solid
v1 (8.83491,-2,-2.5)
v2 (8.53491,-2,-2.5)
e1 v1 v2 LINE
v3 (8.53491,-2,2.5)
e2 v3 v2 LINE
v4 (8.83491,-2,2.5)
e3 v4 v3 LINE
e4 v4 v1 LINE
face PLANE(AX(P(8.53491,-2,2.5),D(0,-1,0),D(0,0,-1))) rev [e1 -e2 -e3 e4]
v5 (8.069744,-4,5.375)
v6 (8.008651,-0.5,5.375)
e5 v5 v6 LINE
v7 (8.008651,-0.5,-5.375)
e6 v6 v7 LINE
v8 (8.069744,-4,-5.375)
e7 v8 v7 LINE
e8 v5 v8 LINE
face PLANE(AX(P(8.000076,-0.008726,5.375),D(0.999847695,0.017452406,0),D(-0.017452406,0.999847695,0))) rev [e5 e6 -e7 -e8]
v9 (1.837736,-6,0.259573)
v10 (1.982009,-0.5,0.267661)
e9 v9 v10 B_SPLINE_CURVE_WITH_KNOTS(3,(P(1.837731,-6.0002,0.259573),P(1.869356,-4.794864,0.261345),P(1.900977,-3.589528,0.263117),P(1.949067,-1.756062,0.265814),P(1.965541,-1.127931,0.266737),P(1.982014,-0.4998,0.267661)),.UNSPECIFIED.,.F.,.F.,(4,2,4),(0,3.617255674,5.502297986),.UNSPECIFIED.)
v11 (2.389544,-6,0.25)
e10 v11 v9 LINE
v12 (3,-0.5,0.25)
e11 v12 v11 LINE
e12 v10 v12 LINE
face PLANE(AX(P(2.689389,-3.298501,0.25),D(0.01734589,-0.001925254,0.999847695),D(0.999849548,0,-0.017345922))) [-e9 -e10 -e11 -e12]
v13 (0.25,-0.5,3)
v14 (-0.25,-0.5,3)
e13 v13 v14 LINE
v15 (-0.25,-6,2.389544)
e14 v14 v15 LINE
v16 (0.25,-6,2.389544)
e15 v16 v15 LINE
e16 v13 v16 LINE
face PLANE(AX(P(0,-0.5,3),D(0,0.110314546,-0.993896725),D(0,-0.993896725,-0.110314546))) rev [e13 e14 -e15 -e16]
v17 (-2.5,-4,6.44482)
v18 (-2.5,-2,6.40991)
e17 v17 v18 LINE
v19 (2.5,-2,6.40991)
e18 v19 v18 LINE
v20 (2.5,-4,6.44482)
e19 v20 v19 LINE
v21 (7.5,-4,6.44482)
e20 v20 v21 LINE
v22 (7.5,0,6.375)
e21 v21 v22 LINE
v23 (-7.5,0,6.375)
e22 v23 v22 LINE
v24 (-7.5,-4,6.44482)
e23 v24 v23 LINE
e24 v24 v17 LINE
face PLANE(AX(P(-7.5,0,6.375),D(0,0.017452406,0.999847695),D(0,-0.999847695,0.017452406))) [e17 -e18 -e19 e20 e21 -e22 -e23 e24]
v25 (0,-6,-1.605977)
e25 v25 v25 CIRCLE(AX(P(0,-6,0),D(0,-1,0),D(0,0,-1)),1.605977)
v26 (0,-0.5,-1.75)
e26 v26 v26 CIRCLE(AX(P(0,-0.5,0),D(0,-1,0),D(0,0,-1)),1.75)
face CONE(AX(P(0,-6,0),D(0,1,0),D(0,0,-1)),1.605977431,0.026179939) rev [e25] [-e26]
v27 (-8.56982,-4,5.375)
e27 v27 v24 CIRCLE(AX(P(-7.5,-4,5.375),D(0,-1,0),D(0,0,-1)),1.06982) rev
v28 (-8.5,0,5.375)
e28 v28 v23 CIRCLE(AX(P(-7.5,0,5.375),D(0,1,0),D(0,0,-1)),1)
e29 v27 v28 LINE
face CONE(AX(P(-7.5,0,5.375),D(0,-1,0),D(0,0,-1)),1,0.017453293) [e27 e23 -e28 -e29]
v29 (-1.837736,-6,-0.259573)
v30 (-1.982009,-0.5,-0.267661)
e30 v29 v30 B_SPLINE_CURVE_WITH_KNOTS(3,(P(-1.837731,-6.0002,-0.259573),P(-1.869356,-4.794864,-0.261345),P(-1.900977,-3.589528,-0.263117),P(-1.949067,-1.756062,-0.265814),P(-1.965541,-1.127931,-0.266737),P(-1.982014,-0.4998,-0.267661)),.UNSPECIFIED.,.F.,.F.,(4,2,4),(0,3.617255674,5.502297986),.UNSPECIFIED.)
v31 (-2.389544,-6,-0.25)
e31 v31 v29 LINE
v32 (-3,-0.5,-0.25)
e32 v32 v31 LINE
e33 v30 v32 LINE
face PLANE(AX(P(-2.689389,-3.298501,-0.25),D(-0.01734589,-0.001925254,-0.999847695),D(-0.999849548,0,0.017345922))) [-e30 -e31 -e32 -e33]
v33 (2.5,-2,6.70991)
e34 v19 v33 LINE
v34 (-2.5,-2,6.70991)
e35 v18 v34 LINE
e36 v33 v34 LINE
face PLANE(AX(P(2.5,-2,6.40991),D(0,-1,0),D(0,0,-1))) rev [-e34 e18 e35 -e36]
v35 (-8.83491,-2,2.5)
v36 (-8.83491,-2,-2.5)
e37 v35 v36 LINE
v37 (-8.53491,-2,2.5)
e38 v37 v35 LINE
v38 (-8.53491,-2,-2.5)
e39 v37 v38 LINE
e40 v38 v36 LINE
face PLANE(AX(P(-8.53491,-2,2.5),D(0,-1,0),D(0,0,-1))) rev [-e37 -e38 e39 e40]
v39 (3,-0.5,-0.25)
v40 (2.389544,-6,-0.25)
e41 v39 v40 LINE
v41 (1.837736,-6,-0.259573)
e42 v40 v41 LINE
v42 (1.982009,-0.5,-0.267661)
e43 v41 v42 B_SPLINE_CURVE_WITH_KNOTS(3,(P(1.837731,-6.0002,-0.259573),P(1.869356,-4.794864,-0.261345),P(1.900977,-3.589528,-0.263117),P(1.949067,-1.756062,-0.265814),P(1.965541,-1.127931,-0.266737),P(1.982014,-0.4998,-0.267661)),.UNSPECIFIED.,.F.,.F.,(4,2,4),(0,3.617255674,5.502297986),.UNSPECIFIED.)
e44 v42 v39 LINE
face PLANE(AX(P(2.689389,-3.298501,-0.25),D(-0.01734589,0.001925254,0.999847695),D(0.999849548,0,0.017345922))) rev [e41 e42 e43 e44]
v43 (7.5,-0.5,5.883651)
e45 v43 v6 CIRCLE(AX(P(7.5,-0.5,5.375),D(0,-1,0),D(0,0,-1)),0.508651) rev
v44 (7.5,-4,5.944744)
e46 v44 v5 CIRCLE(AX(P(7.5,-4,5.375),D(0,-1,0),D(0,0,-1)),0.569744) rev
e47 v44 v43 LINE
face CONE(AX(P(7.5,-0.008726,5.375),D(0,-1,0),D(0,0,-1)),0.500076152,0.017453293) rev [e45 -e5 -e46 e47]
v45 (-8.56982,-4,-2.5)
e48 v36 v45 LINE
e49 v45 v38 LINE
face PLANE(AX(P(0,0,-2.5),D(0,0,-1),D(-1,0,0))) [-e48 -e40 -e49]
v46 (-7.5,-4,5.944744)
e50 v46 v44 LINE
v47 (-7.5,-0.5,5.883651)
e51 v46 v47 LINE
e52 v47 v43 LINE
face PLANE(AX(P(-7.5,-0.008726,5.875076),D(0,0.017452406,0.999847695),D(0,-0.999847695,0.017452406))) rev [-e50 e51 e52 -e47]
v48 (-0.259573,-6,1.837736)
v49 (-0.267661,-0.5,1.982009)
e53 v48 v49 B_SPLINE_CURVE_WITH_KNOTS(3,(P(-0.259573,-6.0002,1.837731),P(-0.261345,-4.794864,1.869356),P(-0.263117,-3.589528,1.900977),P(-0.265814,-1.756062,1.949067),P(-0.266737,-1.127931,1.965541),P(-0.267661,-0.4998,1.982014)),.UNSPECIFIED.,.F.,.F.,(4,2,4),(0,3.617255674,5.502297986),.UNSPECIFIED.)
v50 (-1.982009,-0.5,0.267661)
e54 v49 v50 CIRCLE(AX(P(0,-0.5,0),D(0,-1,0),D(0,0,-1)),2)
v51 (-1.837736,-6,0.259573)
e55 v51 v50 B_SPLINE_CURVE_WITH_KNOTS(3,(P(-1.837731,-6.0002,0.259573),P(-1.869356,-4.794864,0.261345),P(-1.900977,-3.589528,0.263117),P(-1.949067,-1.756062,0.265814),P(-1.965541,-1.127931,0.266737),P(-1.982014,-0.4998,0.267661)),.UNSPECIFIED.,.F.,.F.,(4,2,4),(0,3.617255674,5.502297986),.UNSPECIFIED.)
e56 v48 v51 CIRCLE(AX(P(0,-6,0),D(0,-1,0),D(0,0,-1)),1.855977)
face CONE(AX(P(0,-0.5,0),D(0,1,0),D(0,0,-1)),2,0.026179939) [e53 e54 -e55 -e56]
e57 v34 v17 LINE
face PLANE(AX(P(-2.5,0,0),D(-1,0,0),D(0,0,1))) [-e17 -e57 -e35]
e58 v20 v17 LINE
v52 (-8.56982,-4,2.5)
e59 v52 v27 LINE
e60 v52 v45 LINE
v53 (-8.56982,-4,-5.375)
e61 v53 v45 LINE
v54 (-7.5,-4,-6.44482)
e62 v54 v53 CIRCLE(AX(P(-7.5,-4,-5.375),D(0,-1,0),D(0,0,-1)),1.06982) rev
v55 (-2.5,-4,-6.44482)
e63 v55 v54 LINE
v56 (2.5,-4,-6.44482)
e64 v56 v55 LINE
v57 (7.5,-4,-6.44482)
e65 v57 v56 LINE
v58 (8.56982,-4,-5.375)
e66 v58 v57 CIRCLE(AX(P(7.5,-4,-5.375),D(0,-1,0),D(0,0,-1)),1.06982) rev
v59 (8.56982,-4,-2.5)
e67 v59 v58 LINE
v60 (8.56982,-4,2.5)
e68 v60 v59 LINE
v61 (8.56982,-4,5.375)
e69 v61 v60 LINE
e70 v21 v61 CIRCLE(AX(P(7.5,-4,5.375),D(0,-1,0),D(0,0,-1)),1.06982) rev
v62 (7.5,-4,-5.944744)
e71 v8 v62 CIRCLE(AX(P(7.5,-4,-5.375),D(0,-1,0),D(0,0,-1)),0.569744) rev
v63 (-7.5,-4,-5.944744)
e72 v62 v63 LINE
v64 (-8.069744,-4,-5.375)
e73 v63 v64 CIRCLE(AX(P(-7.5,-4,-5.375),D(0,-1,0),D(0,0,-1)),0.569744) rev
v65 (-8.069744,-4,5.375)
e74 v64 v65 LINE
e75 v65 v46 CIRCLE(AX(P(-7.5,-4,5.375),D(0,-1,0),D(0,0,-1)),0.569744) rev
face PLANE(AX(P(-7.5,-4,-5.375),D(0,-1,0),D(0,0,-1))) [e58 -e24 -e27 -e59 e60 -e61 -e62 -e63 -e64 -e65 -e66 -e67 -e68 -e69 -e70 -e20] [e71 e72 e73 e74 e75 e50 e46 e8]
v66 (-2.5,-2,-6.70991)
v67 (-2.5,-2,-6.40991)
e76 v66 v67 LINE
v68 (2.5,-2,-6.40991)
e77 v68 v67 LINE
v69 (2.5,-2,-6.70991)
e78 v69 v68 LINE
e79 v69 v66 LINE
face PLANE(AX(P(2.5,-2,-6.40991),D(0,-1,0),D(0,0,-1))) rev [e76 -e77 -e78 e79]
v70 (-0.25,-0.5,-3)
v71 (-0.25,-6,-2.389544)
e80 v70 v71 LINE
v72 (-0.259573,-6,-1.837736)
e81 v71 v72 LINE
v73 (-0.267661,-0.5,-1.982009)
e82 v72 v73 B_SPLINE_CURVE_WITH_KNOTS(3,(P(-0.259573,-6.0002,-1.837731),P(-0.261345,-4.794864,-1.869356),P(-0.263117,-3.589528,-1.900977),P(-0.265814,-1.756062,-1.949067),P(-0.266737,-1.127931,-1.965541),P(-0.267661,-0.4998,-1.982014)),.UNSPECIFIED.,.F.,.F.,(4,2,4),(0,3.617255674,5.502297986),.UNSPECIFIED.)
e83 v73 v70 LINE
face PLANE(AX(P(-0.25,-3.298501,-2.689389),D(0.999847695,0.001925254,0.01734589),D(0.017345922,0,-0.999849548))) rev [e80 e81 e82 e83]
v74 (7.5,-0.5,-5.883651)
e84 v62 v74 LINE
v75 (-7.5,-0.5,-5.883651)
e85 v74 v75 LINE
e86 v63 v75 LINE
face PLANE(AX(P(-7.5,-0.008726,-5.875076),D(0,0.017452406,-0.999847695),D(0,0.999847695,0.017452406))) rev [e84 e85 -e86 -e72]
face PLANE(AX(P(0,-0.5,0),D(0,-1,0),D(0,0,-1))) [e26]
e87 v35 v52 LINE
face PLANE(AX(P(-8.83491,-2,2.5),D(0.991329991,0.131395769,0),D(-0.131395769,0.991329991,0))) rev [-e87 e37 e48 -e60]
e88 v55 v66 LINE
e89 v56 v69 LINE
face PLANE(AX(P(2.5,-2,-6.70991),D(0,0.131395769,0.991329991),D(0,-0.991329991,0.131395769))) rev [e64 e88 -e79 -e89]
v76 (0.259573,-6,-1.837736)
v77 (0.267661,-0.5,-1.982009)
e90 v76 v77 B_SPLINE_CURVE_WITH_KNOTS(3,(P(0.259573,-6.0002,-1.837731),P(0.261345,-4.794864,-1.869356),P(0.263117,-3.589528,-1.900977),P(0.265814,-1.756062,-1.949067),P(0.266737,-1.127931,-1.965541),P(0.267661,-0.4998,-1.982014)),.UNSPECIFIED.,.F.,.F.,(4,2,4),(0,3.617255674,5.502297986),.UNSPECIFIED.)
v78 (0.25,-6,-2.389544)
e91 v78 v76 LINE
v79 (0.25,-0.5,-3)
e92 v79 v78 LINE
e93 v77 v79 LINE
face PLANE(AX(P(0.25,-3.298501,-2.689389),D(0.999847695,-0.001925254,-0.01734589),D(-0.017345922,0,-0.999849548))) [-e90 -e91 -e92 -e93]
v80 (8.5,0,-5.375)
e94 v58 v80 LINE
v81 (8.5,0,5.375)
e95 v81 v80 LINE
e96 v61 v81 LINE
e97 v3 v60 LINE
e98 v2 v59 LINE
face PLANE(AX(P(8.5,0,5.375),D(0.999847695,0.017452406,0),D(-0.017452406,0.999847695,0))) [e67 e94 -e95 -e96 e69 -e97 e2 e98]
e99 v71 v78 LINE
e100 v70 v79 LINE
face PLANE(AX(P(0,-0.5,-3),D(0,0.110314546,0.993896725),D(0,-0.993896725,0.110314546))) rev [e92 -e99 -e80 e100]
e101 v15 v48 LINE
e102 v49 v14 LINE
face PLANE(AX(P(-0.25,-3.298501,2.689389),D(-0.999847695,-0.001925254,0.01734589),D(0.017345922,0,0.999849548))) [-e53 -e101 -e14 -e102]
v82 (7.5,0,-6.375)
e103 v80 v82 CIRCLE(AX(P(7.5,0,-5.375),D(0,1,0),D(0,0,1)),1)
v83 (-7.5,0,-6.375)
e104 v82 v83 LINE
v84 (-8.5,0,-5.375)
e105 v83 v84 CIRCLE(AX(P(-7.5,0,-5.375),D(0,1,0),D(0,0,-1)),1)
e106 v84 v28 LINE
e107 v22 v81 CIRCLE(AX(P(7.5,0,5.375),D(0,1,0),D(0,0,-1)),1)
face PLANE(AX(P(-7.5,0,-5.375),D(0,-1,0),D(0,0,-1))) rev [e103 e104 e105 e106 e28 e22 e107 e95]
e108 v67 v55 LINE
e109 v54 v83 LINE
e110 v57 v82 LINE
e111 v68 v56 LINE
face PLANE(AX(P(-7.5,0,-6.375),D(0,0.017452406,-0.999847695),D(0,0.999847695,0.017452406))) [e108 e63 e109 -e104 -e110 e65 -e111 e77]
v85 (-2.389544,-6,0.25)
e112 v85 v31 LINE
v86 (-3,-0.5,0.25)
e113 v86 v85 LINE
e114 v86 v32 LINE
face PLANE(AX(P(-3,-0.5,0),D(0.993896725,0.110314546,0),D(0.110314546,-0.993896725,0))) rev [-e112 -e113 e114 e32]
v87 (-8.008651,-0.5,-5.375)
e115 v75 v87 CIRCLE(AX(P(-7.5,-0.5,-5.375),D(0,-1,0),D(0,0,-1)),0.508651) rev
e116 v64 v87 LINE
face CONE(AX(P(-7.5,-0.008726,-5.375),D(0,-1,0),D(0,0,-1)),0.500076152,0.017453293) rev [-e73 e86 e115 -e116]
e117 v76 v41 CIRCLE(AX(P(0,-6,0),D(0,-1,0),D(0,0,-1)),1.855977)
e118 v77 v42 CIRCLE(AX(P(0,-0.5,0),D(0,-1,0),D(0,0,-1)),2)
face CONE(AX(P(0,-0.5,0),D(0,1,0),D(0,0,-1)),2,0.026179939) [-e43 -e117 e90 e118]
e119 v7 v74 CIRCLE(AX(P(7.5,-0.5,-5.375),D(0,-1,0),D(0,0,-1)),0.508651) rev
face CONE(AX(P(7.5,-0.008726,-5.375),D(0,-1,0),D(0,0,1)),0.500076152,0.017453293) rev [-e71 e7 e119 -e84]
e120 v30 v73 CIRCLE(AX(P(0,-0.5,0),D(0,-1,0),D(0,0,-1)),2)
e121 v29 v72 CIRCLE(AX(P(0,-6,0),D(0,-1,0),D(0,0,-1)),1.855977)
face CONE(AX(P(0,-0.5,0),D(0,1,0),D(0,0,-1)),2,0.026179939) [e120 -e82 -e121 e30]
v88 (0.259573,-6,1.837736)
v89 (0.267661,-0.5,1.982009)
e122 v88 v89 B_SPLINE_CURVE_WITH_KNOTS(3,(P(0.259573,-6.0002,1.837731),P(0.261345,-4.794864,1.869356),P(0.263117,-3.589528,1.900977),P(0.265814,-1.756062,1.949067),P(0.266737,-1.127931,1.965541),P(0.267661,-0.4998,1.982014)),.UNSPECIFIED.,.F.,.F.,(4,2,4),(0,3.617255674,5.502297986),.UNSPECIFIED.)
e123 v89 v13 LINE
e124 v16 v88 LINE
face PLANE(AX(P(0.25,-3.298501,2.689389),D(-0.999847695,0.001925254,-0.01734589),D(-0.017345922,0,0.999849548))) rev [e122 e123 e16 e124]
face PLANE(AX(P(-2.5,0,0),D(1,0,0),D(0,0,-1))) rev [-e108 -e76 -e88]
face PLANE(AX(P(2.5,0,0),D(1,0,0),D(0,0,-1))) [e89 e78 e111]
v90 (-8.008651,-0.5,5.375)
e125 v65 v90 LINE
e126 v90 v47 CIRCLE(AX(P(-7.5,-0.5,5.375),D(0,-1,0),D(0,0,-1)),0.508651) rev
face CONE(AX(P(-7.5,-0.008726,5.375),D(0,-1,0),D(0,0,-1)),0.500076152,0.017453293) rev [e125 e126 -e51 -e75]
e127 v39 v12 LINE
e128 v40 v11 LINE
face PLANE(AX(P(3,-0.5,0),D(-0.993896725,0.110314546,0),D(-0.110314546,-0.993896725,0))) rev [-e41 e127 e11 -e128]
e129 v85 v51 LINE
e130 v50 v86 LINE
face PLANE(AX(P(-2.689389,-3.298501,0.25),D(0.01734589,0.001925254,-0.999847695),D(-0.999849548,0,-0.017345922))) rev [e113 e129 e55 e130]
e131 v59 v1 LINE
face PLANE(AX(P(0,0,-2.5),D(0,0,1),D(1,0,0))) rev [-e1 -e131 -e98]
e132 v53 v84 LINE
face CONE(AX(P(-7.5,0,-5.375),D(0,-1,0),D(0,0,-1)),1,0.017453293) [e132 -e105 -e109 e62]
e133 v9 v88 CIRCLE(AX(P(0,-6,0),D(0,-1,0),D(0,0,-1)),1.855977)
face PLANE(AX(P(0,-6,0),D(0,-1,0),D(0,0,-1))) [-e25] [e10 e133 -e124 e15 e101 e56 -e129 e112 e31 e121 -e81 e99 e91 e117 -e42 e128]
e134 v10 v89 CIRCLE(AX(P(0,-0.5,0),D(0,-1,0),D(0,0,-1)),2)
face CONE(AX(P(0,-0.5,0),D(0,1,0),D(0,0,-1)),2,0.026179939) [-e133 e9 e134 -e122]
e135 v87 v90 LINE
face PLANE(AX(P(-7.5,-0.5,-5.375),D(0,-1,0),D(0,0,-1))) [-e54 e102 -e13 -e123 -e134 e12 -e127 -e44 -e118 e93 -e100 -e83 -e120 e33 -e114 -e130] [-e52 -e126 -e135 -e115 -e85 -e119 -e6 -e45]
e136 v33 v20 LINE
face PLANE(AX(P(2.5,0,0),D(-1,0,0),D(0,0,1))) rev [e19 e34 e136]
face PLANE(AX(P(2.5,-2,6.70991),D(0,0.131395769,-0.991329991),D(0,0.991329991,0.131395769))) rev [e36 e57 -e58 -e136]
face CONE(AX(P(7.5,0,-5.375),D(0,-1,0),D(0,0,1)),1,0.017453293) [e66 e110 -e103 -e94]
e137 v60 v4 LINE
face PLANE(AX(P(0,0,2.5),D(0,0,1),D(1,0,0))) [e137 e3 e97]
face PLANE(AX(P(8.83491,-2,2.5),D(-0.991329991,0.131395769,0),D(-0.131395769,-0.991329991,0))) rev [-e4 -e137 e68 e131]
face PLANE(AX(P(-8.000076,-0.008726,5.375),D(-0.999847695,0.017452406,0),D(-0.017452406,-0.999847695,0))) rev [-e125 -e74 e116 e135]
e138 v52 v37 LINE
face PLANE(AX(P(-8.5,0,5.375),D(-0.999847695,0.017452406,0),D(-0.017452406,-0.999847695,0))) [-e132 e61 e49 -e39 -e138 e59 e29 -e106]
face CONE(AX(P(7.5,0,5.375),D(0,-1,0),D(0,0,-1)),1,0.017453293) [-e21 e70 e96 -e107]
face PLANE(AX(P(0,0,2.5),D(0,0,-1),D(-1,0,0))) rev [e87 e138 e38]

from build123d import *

# Parameters (mm, degrees)
BOSS_EXTRUDE1_DEPTH = 4
BOSS_EXTRUDE1_DRAFT = 1
SHELL1_T            = -0.5
SKETCH2_R           = 2
BOSS_EXTRUDE2_DEPTH = 5.5
BOSS_EXTRUDE2_TAPER = 1.5
CIRPATTERN1_COUNT   = 4
SKETCH4_R           = 1.605977431
CUT_EXTRUDE1_DEPTH  = 5.5
CUT_EXTRUDE1_DRAFT  = 1.5
BOSS_EXTRUDE3_DEPTH = 2.5
BOSS_EXTRUDE4_DEPTH = 2.5


with BuildPart() as part:
    # Sketch1 → Boss-Extrude1 (with draft: the straight prism first)
    with BuildSketch(Plane(origin=(0, 0, 0), x_dir=(1, 0, 0), z_dir=(0, 1, 0))):
        with BuildLine():
            Line((-7.5, -6.375), (7.5, -6.375))
            ThreePointArc((7.5, -6.375), (8.207106781, -6.082106781), (8.5, -5.375))
            Line((8.5, -5.375), (8.5, 5.375))
            ThreePointArc((8.5, 5.375), (8.207106781, 6.082106781), (7.5, 6.375))
            Line((7.5, 6.375), (-7.5, 6.375))
            ThreePointArc((-7.5, 6.375), (-8.207106781, 6.082106781), (-8.5, 5.375))
            Line((-8.5, 5.375), (-8.5, -5.375))
            ThreePointArc((-8.5, -5.375), (-8.207106781, -6.082106781), (-7.5, -6.375))
        make_face()
    extrude(amount=-BOSS_EXTRUDE1_DEPTH)
    # Boss-Extrude1: the draft: its side faces are tilted about the plane it starts from
    boss_extrude1_sides = [part.faces().sort_by_distance(p)[0] for p in [
        (0, -2, 6.375),
        (8.207106781, -2, 6.082106781),
        (8.5, -2, 0),
        (8.207106781, -2, -6.082106781),
        (0, -2, -6.375),
        (-8.207106781, -2, -6.082106781),
        (-8.5, -2, 0),
        (-8.207106781, -2, 6.082106781),
    ]]
    draft(boss_extrude1_sides, Plane(origin=(0, 0, 0), x_dir=(1, 0, 0), z_dir=(0, 1, 0)), BOSS_EXTRUDE1_DRAFT)

    # Shell1
    shell1_openings = [part.faces().sort_by_distance(p)[0] for p in [
        (0, -4, 0),
    ]]
    offset(amount=SHELL1_T, openings=shell1_openings, kind=Kind.INTERSECTION)

    # Sketch2 → Boss-Extrude2 (add)
    with BuildSketch(Plane.XZ.offset(0.5)):
        Circle(SKETCH2_R)
    extrude(amount=BOSS_EXTRUDE2_DEPTH, taper=BOSS_EXTRUDE2_TAPER)

    # Rib1: read off the stored shape, not the designer's step
    # Rib1: loft between two sections, ruled curve by curve
    rib1_from = [
        Edge.make_line((1.98200852, -0.5, 0.267660658), (3, -0.5, 0.25)),
        Edge.make_line((1.98200852, -0.5, -0.267660658), (3, -0.5, -0.25)),
        Edge.make_line((3, -0.5, -0.25), (3, -0.5, 0.25)),
        Edge.make_line((1.98200852, -0.5, -0.267660658), (1.98200852, -0.5, 0.267660658)),
    ]
    rib1_to = [
        Edge.make_line((1.837736121, -6, 0.25957306), (2.389544218, -6, 0.25)),
        Edge.make_line((1.837736121, -6, -0.25957306), (2.389544218, -6, -0.25)),
        Edge.make_line((2.389544218, -6, -0.25), (2.389544218, -6, 0.25)),
        Edge.make_line((1.837736121, -6, -0.25957306), (1.837736121, -6, 0.25957306)),
    ]
    rib1 = Solid(Shell([*[Face.make_surface_from_curves(rib1_from[k], rib1_to[k]) for k in range(4)], Face(Wire(rib1_from)), Face(Wire(rib1_to))]))
    add(rib1)

    # CirPattern1: Rib1 ×4 about axis
    cirpattern1_axis = Axis((0, 0, 0), (0, 1, 0))
    for i in range(1, CIRPATTERN1_COUNT):
        add(rib1.rotate(cirpattern1_axis, i * 360 / CIRPATTERN1_COUNT))


with BuildPart() as cut_extrude1_tool:
    # Sketch4 → Cut-Extrude1 (with draft: the straight prism first)
    with BuildSketch(Plane.XZ.offset(6)):
        Circle(SKETCH4_R)
    extrude(amount=-CUT_EXTRUDE1_DEPTH)
    # Cut-Extrude1: the draft: its side faces are tilted about the plane it starts from
    cut_extrude1_sides = [cut_extrude1_tool.faces().sort_by_distance(p)[0] for p in [
        (-1.605977431, -3.25, 0),
    ]]
    draft(cut_extrude1_sides, Plane.XZ.offset(6), CUT_EXTRUDE1_DRAFT)


with BuildPart() as part_1:
    add(part.part)

    # Cut-Extrude1: cut by cut_extrude1_tool
    add(cut_extrude1_tool.part, mode=Mode.SUBTRACT)

    # Sketch5 → Boss-Extrude3 (add, symmetric)
    with BuildSketch(Plane(origin=(0, 0, 0), x_dir=(0, 0, -1), z_dir=(1, 0, 0))):
        Polygon((6.44482026, -4), (6.40991013, -2), (6.70991013, -2), align=None)
        Polygon((-6.70991013, -2), (-6.44482026, -4), (-6.40991013, -2), align=None)
    extrude(amount=BOSS_EXTRUDE3_DEPTH, both=True)

    # Sketch6 → Boss-Extrude4 (add, symmetric)
    with BuildSketch(Plane.XY):
        Polygon((8.56982026, -4), (8.53491013, -2), (8.83491013, -2), align=None)
        Polygon((-8.83491013, -2), (-8.56982026, -4), (-8.53491013, -2), align=None)
    extrude(amount=BOSS_EXTRUDE4_DEPTH, both=True)


solid = part_1.part
